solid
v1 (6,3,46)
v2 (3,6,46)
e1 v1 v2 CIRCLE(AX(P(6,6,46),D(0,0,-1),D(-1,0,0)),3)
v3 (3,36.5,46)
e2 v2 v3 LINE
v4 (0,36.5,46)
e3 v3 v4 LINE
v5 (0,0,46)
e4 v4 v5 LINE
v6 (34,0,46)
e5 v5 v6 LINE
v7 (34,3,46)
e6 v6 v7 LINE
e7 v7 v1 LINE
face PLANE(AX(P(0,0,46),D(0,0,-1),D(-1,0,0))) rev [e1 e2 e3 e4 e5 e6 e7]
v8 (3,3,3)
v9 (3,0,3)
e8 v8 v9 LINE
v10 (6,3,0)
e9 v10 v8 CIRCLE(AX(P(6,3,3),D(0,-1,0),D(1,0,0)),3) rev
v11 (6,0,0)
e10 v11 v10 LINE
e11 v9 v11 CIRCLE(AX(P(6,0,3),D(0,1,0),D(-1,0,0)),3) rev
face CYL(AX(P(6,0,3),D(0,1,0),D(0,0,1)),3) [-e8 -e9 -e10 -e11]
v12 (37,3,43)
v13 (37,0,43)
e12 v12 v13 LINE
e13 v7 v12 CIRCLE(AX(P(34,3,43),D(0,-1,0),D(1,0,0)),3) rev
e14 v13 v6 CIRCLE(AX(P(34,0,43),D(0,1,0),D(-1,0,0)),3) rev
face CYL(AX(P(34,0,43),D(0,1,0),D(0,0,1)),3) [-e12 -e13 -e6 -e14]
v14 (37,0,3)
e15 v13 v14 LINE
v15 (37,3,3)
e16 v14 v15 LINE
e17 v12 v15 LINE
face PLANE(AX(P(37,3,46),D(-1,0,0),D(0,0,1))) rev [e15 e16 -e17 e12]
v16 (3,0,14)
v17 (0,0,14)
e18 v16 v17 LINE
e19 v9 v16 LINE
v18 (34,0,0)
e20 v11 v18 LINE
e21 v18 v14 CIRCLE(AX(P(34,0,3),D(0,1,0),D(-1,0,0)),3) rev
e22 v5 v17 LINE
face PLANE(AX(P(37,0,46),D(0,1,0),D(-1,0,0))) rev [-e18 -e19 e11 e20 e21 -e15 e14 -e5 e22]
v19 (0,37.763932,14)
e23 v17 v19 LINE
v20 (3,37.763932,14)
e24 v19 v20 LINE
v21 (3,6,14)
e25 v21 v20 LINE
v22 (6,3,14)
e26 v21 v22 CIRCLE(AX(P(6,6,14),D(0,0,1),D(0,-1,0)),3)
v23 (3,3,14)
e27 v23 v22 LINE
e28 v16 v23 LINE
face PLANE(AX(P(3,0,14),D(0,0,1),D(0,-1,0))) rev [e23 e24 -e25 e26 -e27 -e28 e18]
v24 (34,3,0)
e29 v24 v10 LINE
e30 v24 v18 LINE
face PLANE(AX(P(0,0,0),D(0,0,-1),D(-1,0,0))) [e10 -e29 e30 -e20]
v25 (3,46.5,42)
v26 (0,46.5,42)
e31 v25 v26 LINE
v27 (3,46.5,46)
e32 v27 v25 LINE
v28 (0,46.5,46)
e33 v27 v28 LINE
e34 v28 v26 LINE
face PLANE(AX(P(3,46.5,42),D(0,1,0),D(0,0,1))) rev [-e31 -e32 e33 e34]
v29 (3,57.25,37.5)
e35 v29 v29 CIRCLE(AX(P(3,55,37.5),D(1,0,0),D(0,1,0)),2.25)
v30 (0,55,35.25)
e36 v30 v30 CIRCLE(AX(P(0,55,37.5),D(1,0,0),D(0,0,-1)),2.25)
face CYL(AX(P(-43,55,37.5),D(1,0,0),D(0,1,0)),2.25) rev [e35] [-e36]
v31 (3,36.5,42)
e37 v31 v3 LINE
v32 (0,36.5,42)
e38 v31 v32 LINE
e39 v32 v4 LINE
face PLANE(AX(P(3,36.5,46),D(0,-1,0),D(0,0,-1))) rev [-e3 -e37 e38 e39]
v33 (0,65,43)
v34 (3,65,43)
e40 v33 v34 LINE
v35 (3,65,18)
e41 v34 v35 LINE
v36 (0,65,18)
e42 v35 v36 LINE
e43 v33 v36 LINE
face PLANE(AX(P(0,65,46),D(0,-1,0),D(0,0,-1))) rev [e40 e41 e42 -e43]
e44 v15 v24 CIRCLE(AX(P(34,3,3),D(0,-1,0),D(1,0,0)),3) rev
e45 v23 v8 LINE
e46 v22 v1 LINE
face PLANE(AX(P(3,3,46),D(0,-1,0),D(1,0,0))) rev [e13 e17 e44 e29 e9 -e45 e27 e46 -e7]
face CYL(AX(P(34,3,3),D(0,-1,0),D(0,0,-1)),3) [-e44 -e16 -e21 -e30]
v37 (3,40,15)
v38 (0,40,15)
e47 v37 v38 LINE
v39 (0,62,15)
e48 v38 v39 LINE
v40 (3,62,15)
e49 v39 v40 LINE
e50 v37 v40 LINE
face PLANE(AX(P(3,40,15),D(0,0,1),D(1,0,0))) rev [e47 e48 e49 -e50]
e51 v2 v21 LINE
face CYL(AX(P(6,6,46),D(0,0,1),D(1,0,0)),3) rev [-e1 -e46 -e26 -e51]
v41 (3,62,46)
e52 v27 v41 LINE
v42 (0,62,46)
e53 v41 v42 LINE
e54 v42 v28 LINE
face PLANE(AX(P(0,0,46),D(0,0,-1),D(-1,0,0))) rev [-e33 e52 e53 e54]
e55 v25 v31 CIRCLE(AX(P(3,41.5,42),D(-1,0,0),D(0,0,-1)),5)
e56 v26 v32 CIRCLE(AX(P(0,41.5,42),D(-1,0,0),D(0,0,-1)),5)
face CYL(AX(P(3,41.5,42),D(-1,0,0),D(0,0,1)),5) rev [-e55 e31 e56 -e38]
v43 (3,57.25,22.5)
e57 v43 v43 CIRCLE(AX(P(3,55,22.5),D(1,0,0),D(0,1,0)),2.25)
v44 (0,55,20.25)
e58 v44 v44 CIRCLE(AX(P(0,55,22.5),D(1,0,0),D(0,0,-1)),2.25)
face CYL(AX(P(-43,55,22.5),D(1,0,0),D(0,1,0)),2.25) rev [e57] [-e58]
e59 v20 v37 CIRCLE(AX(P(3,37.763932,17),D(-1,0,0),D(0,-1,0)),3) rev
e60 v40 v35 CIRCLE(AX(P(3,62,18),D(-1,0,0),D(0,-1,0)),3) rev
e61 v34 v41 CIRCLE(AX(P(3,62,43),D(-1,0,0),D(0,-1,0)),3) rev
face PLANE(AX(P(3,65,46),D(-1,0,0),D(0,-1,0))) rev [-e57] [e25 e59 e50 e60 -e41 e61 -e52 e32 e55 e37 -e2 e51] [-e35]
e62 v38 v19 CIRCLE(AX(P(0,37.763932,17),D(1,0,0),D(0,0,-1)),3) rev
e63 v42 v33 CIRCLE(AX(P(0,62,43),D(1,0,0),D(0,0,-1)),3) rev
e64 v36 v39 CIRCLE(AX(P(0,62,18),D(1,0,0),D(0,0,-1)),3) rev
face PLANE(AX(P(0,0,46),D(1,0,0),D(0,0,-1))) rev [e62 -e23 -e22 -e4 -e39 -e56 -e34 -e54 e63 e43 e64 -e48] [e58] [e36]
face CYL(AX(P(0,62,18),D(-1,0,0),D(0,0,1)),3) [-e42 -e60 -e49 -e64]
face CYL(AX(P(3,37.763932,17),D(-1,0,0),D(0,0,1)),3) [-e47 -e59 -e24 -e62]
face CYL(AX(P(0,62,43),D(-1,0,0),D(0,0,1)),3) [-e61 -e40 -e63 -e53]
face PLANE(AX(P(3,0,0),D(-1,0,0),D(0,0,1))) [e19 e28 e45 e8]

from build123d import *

# Parameters (mm, degrees)
BOSS_EXTRUDE1_DEPTH = 46
CUT_EXTRUDE1_DEPTH  = 3
SKETCH3_R           = 2.25
CUT_EXTRUDE2_DEPTH  = 46
FILLET1_R           = 3


with BuildPart() as part:
    # Sketch1 → Boss-Extrude1 (new body)
    with BuildSketch(Plane.XY):
        Polygon((0, 0), (0, 65), (3, 65), (3, 3), (37, 3), (37, 0), align=None)
    extrude(amount=BOSS_EXTRUDE1_DEPTH)

    # Sketch2 → Cut-Extrude1 (cut)
    with BuildSketch(Plane.ZY):
        Polygon((0, 65), (14, 65), (15, 65), (15, 40), (14, 40), (14, 0), (0, 0), align=None)
        with BuildLine():
            Line((42, 46.5), (46, 46.5))
            Line((46, 46.5), (46, 36.5))
            Line((46, 36.5), (42, 36.5))
            ThreePointArc((42, 36.5), (37, 41.5), (42, 46.5))
        make_face()
    extrude(amount=-CUT_EXTRUDE1_DEPTH, mode=Mode.SUBTRACT)

    # Sketch3 → Cut-Extrude2 (cut)
    with BuildSketch(Plane(origin=(3, 0, 0), x_dir=(0, 0, -1), z_dir=(1, 0, 0))):
        with Locations(Location((-37.5, 55, 0), (0, 0, 90))):
            Circle(SKETCH3_R)
        with Locations(Location((-22.5, 55, 0), (0, 0, 90))):
            Circle(SKETCH3_R)
    extrude(amount=-CUT_EXTRUDE2_DEPTH, mode=Mode.SUBTRACT)

    # Fillet1
    # the kernel refuses this fillet: 3 mm, written as the material it adds along each edge
    with BuildSketch(Plane(origin=(3, 3, 14), x_dir=(0, 1, 0), z_dir=(0, 0, 1))) as fillet1_piece_1:
        with BuildLine():
            CenterArc((FILLET1_R, -FILLET1_R), FILLET1_R, 90, 90)
            Line((0, -FILLET1_R), (0, 0))
            Line((0, 0), (FILLET1_R, 0))
        make_face()
    extrude(amount=32)
    # the kernel refuses this fillet: 3 mm, written as the material it takes off along each edge
    with BuildSketch(Plane(origin=(-5.590169944, 40, 14), x_dir=(0, -1, 0), z_dir=(1, 0, 0))) as fillet1_2_piece_1:
        with BuildLine():
            CenterArc((2.236067977, -3), FILLET1_R, 90, 48.189685104)
            Line((0, -1), (0, 0))
            Line((0, 0), (2.236067977, 0))
        make_face()
    extrude(amount=14.180339887, mode=Mode.SUBTRACT)
    with BuildSketch(Plane(origin=(37, 10.5, 46), x_dir=(-1, 0, 0), z_dir=(0, -1, 0)), Plane(origin=(3, -7.5, 0), x_dir=(0, 0, 1), z_dir=(0, 1, 0))) as fillet1_2_piece_2:
        with BuildLine():
            CenterArc((FILLET1_R, FILLET1_R), FILLET1_R, 180, 90)
            Line((0, FILLET1_R), (0, 0))
            Line((0, 0), (FILLET1_R, 0))
        make_face()
    extrude(amount=18, mode=Mode.SUBTRACT)
    with BuildSketch(Plane(origin=(37, 10.5, 0), x_dir=(-1, 0, 0), z_dir=(0, -1, 0)), Plane(origin=(-7.5, 65, 46), x_dir=(0, 0, -1), z_dir=(1, 0, 0)), Plane(origin=(-7.5, 65, 15), x_dir=(0, -1, 0), z_dir=(1, 0, 0))) as fillet1_2_piece_3:
        with BuildLine():
            CenterArc((FILLET1_R, -FILLET1_R), FILLET1_R, 90, 90)
            Line((0, -FILLET1_R), (0, 0))
            Line((0, 0), (FILLET1_R, 0))
        make_face()
    extrude(amount=18, mode=Mode.SUBTRACT)


solid = part.part
